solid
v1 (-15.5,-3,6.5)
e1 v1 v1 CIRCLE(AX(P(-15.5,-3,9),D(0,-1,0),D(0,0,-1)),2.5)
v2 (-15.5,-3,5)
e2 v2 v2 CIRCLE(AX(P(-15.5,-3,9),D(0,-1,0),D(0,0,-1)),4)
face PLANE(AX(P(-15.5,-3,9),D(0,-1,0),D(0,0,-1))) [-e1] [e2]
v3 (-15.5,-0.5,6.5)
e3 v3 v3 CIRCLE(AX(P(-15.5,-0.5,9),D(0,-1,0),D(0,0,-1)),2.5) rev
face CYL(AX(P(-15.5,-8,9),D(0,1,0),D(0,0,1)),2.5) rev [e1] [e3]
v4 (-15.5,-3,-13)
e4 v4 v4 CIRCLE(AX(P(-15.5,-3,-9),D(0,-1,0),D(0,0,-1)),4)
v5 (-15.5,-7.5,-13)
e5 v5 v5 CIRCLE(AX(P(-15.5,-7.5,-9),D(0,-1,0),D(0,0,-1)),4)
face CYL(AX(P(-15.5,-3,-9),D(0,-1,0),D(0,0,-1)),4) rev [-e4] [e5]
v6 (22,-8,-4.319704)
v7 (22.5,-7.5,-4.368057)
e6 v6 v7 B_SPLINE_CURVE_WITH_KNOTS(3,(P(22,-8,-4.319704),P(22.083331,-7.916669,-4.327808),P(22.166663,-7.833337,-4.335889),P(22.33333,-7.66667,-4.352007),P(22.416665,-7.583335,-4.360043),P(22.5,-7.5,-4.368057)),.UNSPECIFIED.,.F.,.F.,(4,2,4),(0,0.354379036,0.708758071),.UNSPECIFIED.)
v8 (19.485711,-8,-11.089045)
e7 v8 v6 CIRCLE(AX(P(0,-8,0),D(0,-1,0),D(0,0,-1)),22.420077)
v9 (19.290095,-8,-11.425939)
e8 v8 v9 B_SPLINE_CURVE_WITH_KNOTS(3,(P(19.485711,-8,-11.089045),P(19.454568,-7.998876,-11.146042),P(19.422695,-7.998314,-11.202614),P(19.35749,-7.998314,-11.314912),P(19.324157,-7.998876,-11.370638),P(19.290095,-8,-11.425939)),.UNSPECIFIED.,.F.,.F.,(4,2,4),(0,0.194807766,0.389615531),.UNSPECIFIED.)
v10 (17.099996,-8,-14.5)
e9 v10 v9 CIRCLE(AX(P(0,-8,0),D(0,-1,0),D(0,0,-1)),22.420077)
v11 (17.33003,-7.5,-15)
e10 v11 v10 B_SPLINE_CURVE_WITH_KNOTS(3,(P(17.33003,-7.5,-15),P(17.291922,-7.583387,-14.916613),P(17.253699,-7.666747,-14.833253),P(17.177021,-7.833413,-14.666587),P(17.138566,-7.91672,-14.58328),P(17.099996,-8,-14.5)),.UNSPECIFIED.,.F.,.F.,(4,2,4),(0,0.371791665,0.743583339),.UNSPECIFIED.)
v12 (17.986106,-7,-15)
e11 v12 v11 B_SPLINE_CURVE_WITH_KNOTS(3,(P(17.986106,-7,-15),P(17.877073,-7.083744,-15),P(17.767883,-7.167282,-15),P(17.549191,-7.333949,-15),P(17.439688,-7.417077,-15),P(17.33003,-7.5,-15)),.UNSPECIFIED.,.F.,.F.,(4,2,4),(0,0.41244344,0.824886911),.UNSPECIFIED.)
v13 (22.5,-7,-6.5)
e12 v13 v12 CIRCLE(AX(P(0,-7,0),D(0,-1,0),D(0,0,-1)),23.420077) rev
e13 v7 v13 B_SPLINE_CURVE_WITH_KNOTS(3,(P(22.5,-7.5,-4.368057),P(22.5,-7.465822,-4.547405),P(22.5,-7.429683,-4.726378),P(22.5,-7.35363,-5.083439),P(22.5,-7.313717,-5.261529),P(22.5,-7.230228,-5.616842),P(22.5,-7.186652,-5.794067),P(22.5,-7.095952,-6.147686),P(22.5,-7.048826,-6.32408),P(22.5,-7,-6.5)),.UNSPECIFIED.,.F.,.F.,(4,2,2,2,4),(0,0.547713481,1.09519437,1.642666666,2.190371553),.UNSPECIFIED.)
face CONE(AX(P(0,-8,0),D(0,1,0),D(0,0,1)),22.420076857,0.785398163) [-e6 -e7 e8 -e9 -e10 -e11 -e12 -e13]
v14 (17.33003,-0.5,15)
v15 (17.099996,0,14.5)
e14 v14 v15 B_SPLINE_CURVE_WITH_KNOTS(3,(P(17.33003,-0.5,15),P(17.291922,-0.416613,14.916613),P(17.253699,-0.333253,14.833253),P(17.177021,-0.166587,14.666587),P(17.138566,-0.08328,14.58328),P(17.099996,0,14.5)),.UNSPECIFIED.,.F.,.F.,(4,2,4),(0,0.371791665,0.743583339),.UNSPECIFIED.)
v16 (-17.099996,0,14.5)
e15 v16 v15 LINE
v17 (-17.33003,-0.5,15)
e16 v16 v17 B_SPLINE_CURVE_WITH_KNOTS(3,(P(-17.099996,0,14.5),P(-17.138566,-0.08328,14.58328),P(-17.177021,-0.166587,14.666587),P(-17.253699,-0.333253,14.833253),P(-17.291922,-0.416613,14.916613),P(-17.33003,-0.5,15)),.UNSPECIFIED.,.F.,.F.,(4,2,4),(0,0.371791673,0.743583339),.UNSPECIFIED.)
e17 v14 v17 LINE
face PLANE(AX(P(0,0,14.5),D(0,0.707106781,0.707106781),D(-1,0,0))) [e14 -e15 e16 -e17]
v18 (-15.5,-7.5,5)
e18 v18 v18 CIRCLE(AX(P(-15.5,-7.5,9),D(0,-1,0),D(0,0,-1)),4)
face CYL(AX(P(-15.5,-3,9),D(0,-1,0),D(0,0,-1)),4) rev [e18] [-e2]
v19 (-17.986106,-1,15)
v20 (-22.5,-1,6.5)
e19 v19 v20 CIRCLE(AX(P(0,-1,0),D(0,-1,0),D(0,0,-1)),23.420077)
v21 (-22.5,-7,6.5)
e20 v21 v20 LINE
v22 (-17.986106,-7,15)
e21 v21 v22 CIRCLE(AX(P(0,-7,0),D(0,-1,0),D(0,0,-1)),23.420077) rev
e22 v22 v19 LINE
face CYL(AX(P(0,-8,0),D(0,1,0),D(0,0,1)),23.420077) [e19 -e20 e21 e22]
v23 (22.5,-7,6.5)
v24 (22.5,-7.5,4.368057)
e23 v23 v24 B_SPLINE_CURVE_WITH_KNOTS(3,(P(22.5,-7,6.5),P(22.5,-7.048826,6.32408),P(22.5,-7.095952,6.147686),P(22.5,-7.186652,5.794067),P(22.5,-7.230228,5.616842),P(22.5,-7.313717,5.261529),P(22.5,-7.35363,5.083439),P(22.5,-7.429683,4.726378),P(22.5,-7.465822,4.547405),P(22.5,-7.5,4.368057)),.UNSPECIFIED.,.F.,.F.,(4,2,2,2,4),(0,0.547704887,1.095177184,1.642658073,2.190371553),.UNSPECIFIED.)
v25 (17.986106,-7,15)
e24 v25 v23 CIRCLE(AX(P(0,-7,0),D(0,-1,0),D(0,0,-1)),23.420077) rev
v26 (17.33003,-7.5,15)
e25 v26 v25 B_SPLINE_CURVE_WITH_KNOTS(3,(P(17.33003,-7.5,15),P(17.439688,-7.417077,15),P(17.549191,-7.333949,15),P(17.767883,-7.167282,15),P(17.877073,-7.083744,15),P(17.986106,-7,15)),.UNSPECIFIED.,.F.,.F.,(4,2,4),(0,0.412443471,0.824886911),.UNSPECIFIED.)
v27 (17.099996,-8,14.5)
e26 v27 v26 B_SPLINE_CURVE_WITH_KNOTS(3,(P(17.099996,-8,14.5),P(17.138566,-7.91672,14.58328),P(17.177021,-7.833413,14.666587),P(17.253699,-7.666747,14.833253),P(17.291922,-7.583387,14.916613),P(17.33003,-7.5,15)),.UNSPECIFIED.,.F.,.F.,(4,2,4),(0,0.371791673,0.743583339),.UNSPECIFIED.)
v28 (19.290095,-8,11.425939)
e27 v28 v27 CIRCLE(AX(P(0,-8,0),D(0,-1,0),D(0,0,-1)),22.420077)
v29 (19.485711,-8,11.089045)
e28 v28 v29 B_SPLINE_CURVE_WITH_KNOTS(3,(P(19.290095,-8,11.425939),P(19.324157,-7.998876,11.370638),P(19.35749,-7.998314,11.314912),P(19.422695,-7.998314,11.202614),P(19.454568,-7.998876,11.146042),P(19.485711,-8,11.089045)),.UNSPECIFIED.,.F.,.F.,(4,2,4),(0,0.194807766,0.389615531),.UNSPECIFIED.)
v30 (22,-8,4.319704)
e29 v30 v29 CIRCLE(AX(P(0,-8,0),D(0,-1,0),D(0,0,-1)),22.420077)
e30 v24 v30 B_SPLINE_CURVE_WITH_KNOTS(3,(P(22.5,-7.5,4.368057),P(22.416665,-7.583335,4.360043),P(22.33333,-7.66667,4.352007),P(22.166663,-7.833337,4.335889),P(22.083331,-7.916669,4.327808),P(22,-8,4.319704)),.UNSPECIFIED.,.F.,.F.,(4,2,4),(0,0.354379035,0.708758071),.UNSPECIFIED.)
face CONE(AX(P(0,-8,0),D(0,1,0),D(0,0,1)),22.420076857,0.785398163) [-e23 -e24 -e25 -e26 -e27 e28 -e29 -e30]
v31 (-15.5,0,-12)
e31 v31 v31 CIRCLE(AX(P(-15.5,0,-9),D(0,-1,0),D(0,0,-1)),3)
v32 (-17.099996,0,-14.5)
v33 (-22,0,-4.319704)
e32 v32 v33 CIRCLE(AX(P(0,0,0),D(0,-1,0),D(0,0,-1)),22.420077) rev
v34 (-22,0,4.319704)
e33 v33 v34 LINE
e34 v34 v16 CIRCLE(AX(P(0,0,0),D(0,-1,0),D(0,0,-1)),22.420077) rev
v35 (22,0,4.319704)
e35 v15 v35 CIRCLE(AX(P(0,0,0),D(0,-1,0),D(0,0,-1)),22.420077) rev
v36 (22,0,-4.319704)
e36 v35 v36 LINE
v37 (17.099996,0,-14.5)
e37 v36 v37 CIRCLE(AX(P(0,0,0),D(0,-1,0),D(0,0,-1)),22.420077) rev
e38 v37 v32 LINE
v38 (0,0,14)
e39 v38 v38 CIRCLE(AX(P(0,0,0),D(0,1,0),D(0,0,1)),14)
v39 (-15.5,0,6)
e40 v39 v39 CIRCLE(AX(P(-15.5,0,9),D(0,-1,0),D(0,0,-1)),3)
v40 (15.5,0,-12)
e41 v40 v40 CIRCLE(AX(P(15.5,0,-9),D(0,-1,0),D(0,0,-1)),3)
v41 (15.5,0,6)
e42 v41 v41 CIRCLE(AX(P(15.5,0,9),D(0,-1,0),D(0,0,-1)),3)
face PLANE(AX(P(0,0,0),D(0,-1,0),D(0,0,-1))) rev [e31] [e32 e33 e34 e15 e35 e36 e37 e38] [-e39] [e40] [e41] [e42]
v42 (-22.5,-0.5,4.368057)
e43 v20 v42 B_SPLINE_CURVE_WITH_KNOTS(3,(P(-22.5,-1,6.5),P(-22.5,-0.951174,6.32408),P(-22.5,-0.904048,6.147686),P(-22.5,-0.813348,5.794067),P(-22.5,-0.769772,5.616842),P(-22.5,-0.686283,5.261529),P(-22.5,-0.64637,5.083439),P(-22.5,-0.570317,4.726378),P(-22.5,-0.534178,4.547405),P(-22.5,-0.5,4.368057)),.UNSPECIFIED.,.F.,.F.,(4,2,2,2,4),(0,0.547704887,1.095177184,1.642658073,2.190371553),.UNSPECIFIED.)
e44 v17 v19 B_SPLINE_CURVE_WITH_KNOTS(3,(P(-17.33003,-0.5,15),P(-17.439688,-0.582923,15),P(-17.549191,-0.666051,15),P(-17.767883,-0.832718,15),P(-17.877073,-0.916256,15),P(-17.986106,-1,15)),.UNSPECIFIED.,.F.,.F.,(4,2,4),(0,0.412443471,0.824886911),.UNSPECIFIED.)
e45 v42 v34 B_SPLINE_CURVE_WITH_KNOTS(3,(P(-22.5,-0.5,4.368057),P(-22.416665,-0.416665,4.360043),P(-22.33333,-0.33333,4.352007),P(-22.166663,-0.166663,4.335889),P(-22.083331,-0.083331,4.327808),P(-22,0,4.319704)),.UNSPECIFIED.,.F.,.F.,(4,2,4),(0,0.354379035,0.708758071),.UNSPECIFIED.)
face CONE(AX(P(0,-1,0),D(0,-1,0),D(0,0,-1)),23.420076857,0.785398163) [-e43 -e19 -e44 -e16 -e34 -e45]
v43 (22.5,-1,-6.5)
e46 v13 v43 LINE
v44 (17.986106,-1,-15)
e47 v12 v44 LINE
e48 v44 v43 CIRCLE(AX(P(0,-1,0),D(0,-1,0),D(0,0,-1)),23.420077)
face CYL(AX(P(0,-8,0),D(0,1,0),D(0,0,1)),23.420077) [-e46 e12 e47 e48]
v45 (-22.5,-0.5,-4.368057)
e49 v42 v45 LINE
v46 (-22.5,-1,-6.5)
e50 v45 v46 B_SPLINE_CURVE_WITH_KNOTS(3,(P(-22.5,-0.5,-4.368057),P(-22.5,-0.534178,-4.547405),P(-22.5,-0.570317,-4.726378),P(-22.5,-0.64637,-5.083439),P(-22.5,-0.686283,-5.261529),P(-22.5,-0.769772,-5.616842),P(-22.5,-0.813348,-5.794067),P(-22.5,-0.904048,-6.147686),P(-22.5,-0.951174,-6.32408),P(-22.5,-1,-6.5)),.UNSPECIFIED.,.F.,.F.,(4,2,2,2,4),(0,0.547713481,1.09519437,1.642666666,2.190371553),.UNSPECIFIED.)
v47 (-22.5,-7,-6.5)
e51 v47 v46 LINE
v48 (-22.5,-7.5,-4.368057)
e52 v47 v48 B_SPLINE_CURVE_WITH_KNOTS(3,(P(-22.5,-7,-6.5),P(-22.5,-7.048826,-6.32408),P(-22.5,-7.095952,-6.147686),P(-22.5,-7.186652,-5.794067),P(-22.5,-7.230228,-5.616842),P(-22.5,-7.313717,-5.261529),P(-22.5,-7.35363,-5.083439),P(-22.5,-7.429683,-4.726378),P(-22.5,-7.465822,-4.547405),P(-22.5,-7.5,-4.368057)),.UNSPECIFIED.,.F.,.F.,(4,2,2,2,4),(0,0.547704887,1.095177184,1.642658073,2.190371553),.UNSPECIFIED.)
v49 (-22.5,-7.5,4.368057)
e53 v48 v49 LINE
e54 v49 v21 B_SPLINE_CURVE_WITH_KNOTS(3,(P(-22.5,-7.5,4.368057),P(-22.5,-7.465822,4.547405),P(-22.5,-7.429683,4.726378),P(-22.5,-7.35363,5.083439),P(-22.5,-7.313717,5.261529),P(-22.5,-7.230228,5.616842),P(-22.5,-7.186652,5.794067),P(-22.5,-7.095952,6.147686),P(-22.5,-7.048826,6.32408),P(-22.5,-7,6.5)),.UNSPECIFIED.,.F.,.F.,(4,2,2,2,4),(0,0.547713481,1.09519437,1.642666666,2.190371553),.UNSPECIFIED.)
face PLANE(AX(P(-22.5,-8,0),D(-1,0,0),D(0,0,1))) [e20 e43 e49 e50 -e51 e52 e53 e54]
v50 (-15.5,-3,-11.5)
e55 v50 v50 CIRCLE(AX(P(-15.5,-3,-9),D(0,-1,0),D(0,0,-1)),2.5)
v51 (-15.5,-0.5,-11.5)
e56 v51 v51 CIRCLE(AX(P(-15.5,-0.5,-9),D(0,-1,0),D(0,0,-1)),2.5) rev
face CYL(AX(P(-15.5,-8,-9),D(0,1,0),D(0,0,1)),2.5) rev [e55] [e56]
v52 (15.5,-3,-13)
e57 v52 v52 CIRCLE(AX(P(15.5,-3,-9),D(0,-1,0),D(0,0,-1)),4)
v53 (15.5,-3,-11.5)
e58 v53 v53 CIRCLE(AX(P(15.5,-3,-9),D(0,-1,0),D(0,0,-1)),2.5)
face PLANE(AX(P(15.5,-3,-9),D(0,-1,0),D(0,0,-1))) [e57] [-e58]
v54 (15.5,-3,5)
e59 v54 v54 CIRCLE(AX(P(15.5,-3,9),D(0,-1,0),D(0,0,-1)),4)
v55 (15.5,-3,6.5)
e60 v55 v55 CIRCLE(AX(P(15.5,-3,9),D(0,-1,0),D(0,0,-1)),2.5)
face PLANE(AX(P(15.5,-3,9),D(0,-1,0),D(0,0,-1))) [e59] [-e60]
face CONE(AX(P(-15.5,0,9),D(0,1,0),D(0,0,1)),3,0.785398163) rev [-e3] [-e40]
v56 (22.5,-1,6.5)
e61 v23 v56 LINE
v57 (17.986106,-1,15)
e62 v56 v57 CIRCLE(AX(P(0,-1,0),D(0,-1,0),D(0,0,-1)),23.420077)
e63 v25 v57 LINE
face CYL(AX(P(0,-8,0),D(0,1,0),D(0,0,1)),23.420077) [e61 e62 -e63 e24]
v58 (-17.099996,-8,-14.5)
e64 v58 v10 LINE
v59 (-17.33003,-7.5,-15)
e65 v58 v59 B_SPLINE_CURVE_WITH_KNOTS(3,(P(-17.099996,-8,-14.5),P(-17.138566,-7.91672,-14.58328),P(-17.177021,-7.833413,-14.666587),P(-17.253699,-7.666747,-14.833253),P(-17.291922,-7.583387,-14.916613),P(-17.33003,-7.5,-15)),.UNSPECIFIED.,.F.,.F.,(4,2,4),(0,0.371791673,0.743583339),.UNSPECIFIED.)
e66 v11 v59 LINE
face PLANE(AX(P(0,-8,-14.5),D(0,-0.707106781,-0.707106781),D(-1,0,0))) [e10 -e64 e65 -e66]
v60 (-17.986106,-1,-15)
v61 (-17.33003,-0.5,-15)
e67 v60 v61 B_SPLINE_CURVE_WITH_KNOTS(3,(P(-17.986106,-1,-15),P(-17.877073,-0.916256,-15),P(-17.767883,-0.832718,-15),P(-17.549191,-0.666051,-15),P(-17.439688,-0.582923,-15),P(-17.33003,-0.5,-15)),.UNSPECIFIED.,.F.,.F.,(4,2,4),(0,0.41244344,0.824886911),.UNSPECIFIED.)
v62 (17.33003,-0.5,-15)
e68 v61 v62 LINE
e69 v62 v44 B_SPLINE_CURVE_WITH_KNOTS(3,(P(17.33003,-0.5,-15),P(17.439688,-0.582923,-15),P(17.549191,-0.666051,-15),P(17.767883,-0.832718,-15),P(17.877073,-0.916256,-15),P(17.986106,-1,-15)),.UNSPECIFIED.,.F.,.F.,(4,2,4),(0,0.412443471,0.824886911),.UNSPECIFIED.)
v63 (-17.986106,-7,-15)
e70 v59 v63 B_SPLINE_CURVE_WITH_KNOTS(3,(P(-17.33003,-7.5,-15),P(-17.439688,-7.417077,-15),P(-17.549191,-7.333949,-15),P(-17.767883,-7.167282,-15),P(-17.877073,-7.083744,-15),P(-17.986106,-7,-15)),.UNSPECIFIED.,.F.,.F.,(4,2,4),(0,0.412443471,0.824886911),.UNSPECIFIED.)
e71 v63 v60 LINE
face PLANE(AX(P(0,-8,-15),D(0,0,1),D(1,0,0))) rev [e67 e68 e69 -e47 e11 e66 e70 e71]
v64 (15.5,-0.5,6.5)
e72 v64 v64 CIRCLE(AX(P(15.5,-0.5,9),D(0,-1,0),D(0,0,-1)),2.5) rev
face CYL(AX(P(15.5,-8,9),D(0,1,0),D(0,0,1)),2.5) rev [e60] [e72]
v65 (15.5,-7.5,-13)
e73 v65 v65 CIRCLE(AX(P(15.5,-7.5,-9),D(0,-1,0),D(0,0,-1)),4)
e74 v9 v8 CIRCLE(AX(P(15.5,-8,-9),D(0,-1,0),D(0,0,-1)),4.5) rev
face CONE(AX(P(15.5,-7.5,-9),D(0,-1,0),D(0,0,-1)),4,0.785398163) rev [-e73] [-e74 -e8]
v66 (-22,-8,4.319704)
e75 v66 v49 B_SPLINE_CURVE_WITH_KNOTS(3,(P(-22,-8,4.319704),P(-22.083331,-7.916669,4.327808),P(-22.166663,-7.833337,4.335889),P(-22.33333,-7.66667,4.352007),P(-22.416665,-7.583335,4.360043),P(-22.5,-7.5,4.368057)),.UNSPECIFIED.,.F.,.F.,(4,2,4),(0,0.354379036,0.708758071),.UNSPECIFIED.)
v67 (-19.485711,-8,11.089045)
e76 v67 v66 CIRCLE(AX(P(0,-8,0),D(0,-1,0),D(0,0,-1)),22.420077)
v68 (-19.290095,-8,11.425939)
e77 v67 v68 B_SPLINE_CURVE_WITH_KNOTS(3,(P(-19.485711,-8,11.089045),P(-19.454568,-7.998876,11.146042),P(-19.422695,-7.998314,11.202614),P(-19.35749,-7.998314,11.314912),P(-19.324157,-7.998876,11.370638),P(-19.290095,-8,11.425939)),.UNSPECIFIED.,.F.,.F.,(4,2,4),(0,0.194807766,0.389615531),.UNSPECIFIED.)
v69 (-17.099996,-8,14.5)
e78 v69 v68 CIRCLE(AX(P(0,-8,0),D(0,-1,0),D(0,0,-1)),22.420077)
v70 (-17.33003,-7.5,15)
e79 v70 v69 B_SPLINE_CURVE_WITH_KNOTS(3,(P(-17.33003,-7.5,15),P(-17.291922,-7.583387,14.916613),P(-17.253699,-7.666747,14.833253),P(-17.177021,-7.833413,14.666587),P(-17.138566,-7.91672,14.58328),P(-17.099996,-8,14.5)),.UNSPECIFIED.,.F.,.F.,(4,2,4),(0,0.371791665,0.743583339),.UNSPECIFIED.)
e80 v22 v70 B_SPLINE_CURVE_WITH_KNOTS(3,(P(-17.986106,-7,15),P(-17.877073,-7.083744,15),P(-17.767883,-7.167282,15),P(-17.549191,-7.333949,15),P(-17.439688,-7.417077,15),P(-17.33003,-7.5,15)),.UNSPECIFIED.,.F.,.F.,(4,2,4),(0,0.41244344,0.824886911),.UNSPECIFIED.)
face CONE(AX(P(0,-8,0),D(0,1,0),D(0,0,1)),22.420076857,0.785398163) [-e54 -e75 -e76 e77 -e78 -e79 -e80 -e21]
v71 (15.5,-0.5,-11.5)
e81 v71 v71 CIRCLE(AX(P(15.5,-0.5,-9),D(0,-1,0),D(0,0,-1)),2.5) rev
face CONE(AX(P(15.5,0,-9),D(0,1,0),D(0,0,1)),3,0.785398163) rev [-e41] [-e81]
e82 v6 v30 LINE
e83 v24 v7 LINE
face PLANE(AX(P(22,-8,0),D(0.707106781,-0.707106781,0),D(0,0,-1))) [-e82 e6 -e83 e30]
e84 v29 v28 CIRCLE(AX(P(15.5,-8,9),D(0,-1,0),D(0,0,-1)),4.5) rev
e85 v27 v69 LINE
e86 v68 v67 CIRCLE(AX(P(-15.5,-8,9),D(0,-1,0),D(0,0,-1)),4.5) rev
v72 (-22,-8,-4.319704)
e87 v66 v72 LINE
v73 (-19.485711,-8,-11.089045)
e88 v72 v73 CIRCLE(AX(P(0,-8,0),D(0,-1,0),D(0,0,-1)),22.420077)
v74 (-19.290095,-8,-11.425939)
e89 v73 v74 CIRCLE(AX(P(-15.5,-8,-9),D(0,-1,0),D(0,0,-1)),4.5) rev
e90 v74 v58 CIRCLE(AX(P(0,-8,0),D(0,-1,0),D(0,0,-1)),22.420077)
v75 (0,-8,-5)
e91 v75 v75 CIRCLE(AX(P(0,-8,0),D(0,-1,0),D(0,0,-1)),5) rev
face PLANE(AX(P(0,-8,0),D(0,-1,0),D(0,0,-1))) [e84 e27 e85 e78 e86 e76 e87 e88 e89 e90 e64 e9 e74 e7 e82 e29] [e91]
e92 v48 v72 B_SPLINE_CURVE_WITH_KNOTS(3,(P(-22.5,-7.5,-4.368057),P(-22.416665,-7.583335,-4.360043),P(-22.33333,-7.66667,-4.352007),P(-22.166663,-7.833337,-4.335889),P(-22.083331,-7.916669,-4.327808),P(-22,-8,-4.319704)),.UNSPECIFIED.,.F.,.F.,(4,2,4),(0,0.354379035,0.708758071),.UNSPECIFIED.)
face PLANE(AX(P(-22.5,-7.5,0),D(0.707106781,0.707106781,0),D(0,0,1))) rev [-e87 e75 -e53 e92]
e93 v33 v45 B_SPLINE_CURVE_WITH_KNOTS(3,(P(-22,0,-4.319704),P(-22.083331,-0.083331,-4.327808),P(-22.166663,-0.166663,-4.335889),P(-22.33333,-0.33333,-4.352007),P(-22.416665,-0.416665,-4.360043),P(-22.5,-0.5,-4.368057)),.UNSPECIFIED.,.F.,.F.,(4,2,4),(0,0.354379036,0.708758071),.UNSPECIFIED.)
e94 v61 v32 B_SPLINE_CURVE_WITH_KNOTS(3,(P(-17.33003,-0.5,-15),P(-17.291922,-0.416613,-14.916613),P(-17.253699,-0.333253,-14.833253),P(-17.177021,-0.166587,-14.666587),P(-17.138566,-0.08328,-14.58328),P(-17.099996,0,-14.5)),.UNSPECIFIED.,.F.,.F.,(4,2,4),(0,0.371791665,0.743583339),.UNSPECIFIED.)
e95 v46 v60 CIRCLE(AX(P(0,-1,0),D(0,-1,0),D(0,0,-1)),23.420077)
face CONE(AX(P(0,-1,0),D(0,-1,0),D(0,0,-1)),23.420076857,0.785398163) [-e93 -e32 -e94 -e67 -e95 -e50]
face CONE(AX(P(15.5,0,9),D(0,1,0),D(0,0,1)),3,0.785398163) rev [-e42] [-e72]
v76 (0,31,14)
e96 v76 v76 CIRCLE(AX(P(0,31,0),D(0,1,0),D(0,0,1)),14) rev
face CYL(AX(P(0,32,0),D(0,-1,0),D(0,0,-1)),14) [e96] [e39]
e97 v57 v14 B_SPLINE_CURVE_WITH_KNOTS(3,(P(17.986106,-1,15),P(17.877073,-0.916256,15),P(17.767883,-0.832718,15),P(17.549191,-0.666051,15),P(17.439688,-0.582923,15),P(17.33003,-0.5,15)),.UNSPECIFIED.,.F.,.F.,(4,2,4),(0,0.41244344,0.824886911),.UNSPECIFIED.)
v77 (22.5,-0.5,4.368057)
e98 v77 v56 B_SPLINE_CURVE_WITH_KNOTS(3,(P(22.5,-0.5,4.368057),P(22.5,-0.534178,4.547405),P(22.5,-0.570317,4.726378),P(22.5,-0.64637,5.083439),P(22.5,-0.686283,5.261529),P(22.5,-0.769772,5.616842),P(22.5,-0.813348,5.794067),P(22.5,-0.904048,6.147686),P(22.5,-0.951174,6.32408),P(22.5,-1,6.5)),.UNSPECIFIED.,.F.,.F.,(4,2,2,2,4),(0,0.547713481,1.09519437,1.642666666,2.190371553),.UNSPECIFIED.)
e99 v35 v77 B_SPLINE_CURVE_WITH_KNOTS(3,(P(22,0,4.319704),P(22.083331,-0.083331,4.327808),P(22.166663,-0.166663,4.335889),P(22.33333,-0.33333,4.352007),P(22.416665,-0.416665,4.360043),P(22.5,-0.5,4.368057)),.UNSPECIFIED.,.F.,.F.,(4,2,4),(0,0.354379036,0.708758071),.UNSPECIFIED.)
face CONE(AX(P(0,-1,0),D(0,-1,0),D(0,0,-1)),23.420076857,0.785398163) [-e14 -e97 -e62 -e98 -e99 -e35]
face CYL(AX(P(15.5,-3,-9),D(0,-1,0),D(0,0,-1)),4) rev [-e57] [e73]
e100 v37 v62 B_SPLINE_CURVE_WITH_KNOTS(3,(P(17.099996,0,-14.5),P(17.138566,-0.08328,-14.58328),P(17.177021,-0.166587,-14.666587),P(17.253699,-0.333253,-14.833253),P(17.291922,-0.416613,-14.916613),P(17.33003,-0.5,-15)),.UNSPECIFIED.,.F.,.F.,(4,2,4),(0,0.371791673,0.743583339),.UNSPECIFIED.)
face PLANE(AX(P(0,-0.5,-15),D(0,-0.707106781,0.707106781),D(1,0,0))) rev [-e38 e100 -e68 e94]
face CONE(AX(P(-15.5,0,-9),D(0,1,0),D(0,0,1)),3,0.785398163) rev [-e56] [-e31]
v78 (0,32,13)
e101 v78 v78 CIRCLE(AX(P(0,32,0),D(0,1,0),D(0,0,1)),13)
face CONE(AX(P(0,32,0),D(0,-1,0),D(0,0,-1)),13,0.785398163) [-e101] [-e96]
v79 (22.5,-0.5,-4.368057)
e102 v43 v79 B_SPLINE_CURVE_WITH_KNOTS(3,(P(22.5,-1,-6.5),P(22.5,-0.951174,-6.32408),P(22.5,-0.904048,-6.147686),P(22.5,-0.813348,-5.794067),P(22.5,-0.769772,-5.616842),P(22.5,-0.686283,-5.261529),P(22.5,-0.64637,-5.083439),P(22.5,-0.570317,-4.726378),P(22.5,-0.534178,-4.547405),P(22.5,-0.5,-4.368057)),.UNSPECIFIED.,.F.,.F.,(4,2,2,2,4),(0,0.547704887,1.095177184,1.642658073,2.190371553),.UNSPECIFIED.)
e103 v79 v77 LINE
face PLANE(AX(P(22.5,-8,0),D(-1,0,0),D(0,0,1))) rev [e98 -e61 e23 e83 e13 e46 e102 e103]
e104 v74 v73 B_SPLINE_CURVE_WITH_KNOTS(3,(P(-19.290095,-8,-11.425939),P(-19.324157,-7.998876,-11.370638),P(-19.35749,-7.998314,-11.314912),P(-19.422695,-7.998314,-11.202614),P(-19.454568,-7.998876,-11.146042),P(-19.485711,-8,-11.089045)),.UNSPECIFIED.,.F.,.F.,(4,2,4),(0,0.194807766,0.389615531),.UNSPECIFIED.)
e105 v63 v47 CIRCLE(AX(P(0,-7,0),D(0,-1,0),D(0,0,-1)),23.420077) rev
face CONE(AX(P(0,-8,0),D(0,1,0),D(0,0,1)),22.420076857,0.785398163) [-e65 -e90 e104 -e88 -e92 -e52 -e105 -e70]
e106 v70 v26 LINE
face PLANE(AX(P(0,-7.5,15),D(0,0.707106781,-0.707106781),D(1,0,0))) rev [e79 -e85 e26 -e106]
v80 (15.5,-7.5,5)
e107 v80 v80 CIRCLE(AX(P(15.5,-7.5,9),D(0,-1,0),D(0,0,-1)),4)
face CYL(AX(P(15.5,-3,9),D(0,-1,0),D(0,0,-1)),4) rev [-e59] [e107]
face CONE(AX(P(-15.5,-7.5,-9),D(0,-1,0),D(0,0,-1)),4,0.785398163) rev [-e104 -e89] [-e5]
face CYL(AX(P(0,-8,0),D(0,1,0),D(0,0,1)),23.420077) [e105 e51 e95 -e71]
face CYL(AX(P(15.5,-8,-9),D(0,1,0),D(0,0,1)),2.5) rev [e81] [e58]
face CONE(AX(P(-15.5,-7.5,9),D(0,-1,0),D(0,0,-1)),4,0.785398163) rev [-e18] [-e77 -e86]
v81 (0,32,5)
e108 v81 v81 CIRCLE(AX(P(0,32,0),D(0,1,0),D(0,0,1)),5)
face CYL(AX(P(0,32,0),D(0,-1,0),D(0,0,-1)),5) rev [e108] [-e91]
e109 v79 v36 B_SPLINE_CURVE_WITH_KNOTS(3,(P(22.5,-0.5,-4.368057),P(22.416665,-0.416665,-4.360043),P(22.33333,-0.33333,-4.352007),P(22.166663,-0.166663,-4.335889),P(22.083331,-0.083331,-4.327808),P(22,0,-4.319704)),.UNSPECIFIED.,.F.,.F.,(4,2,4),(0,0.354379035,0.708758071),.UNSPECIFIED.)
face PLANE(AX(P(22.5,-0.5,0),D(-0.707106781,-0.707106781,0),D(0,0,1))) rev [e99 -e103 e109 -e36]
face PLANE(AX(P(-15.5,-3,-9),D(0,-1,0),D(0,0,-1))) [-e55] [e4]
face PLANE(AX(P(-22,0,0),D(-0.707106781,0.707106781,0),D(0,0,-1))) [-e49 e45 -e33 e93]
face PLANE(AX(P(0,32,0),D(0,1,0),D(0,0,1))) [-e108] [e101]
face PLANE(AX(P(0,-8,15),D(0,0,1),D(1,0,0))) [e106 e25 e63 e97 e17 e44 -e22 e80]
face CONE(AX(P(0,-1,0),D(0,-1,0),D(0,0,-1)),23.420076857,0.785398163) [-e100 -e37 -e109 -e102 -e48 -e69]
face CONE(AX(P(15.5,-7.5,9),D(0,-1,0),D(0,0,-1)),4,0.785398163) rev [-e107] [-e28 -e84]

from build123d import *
from build123d.topology import SkipClean

# Parameters (mm, degrees)
SKETCH1_R           = 14
SKETCH1_R_2         = 5
BOSS_EXTRUDE1_DEPTH = 32
BOSS_EXTRUDE3_START = 8
SKETCH2_R           = 2.5
SKETCH2_R_2         = 5
BOSS_EXTRUDE3_DEPTH = 8
SKETCH3_R           = 4
CUT_EXTRUDE1_DEPTH  = 5
CHAMFER2_SIZE       = 0.5
CHAMFER3_SIZE       = 1
CHAMFER4_SIZE       = 0.5


with BuildPart() as part:
    # Sketch1 → Boss-Extrude1 (new body)
    with BuildSketch(Plane(origin=(0, 0, 0), x_dir=(1, 0, 0), z_dir=(0, 1, 0))):
        with Locations(Location((0, 0, 0), (0, 0, 270))):
            Circle(SKETCH1_R)
        with Locations(Location((0, 0, 0), (0, 0, 270))):
            Circle(SKETCH1_R_2, mode=Mode.SUBTRACT)
    extrude(amount=BOSS_EXTRUDE1_DEPTH)

    # Sketch2 → Boss-Extrude3 (add)
    with SkipClean():  # the faces are left unmerged after this step: merging them gives an invalid solid
        with BuildSketch(Plane.XZ.offset(BOSS_EXTRUDE3_START)):
            with BuildLine():
                ThreePointArc((-22.5, -6.5), (-20.684382748, -10.984366633), (-17.986105749, -15))
                Line((-17.986105749, -15), (17.986105749, -15))
                ThreePointArc((17.986105749, -15), (20.684382748, -10.984366633), (22.5, -6.5))
                Line((22.5, -6.5), (22.5, 6.5))
                ThreePointArc((22.5, 6.5), (20.684382748, 10.984366633), (17.986105749, 15))
                Line((17.986105749, 15), (-17.986105749, 15))
                ThreePointArc((-17.986105749, 15), (-20.684382748, 10.984366633), (-22.5, 6.5))
                Line((-22.5, 6.5), (-22.5, -6.5))
            make_face()
            with Locations(Location((-15.5, -9, 0), (0, 0, 270))):
                Circle(SKETCH2_R, mode=Mode.SUBTRACT)
            with Locations(Location((0, 0, 0), (0, 0, 270))):
                Circle(SKETCH2_R_2, mode=Mode.SUBTRACT)
            with Locations(Location((15.5, -9, 0), (0, 0, 270))):
                Circle(SKETCH2_R, mode=Mode.SUBTRACT)
            with Locations(Location((-15.5, 9, 0), (0, 0, 270))):
                Circle(SKETCH2_R, mode=Mode.SUBTRACT)
            with Locations(Location((15.5, 9, 0), (0, 0, 270))):
                Circle(SKETCH2_R, mode=Mode.SUBTRACT)
        extrude(amount=-BOSS_EXTRUDE3_DEPTH)

    # Sketch3 → Cut-Extrude1 (cut)
    with SkipClean():  # the faces are left unmerged after this step: merging them gives an invalid solid
        with BuildSketch(Plane.XZ.offset(8)):
            with Locations(Location((-15.5, 9, 0), (0, 0, 270))):
                Circle(SKETCH3_R)
            with Locations(Location((-15.5, -9, 0), (0, 0, 270))):
                Circle(SKETCH3_R)
            with Locations(Location((15.5, -9, 0), (0, 0, 270))):
                Circle(SKETCH3_R)
            with Locations(Location((15.5, 9, 0), (0, 0, 270))):
                Circle(SKETCH3_R)
        extrude(amount=-CUT_EXTRUDE1_DEPTH, mode=Mode.SUBTRACT)

    # Chamfer2
    chamfer2_edges = [part.edges().sort_by_distance(p)[0] for p in [
        (22.5, 0, 0),
        (0, -8, 15),
        (-22.5, -8, 0),
        (0, -8, -15),
        (22.5, -8, 0),
        (-15.5, 0, -6.5),
        (15.5, 0, -6.5),
        (15.5, 0, 11.5),
        (-15.5, 0, 11.5),
        (-22.5, 0, 0),
        (0, 0, 15),
        (0, 0, -15),
    ]]
    chamfer(chamfer2_edges, length=CHAMFER2_SIZE)

    # Chamfer3
    chamfer3_edges = [part.edges().sort_by_distance(p)[0] for p in [
        (20.453146311, -8, -11.409154481),
        (-20.453146311, -8, -11.409154481),
        (-20.453146311, -8, 11.409154481),
        (20.453146311, -8, 11.409154481),
        (20.453146311, 0, -11.409154481),
        (20.453146311, 0, 11.409154481),
        (-20.453146311, 0, 11.409154481),
        (-20.453146311, 0, -11.409154481),
        (0, 32, -14),
    ]]
    chamfer(chamfer3_edges, length=CHAMFER3_SIZE)

    # Chamfer4
    # the kernel refuses this chamfer: 0.5 mm, written as the material it takes off along each edge
    with BuildSketch(Plane(origin=(15.5, -8, 9), x_dir=(0, 0, -1), z_dir=(-1, 0, 0))) as chamfer4_piece_1:
        Polygon((4 + CHAMFER4_SIZE, 0), (4, -CHAMFER4_SIZE), (4, 0), align=None)
    revolve(axis=Axis((15.5, -8, 9), (0, -1, 0)), mode=Mode.SUBTRACT)
    with BuildSketch(Plane(origin=(15.5, -8, -9), x_dir=(0, 0, -1), z_dir=(-1, 0, 0))) as chamfer4_piece_2:
        Polygon((4 + CHAMFER4_SIZE, 0), (4, -CHAMFER4_SIZE), (4, 0), align=None)
    revolve(axis=Axis((15.5, -8, -9), (0, -1, 0)), mode=Mode.SUBTRACT)
    with BuildSketch(Plane(origin=(-15.5, -8, -9), x_dir=(0, 0, -1), z_dir=(-1, 0, 0))) as chamfer4_piece_3:
        Polygon((4 + CHAMFER4_SIZE, 0), (4, -CHAMFER4_SIZE), (4, 0), align=None)
    revolve(axis=Axis((-15.5, -8, -9), (0, -1, 0)), mode=Mode.SUBTRACT)
    with BuildSketch(Plane(origin=(-15.5, -8, 9), x_dir=(0, 0, -1), z_dir=(-1, 0, 0))) as chamfer4_piece_4:
        Polygon((4 + CHAMFER4_SIZE, 0), (4, -CHAMFER4_SIZE), (4, 0), align=None)
    revolve(axis=Axis((-15.5, -8, 9), (0, -1, 0)), mode=Mode.SUBTRACT)


solid = part.part
